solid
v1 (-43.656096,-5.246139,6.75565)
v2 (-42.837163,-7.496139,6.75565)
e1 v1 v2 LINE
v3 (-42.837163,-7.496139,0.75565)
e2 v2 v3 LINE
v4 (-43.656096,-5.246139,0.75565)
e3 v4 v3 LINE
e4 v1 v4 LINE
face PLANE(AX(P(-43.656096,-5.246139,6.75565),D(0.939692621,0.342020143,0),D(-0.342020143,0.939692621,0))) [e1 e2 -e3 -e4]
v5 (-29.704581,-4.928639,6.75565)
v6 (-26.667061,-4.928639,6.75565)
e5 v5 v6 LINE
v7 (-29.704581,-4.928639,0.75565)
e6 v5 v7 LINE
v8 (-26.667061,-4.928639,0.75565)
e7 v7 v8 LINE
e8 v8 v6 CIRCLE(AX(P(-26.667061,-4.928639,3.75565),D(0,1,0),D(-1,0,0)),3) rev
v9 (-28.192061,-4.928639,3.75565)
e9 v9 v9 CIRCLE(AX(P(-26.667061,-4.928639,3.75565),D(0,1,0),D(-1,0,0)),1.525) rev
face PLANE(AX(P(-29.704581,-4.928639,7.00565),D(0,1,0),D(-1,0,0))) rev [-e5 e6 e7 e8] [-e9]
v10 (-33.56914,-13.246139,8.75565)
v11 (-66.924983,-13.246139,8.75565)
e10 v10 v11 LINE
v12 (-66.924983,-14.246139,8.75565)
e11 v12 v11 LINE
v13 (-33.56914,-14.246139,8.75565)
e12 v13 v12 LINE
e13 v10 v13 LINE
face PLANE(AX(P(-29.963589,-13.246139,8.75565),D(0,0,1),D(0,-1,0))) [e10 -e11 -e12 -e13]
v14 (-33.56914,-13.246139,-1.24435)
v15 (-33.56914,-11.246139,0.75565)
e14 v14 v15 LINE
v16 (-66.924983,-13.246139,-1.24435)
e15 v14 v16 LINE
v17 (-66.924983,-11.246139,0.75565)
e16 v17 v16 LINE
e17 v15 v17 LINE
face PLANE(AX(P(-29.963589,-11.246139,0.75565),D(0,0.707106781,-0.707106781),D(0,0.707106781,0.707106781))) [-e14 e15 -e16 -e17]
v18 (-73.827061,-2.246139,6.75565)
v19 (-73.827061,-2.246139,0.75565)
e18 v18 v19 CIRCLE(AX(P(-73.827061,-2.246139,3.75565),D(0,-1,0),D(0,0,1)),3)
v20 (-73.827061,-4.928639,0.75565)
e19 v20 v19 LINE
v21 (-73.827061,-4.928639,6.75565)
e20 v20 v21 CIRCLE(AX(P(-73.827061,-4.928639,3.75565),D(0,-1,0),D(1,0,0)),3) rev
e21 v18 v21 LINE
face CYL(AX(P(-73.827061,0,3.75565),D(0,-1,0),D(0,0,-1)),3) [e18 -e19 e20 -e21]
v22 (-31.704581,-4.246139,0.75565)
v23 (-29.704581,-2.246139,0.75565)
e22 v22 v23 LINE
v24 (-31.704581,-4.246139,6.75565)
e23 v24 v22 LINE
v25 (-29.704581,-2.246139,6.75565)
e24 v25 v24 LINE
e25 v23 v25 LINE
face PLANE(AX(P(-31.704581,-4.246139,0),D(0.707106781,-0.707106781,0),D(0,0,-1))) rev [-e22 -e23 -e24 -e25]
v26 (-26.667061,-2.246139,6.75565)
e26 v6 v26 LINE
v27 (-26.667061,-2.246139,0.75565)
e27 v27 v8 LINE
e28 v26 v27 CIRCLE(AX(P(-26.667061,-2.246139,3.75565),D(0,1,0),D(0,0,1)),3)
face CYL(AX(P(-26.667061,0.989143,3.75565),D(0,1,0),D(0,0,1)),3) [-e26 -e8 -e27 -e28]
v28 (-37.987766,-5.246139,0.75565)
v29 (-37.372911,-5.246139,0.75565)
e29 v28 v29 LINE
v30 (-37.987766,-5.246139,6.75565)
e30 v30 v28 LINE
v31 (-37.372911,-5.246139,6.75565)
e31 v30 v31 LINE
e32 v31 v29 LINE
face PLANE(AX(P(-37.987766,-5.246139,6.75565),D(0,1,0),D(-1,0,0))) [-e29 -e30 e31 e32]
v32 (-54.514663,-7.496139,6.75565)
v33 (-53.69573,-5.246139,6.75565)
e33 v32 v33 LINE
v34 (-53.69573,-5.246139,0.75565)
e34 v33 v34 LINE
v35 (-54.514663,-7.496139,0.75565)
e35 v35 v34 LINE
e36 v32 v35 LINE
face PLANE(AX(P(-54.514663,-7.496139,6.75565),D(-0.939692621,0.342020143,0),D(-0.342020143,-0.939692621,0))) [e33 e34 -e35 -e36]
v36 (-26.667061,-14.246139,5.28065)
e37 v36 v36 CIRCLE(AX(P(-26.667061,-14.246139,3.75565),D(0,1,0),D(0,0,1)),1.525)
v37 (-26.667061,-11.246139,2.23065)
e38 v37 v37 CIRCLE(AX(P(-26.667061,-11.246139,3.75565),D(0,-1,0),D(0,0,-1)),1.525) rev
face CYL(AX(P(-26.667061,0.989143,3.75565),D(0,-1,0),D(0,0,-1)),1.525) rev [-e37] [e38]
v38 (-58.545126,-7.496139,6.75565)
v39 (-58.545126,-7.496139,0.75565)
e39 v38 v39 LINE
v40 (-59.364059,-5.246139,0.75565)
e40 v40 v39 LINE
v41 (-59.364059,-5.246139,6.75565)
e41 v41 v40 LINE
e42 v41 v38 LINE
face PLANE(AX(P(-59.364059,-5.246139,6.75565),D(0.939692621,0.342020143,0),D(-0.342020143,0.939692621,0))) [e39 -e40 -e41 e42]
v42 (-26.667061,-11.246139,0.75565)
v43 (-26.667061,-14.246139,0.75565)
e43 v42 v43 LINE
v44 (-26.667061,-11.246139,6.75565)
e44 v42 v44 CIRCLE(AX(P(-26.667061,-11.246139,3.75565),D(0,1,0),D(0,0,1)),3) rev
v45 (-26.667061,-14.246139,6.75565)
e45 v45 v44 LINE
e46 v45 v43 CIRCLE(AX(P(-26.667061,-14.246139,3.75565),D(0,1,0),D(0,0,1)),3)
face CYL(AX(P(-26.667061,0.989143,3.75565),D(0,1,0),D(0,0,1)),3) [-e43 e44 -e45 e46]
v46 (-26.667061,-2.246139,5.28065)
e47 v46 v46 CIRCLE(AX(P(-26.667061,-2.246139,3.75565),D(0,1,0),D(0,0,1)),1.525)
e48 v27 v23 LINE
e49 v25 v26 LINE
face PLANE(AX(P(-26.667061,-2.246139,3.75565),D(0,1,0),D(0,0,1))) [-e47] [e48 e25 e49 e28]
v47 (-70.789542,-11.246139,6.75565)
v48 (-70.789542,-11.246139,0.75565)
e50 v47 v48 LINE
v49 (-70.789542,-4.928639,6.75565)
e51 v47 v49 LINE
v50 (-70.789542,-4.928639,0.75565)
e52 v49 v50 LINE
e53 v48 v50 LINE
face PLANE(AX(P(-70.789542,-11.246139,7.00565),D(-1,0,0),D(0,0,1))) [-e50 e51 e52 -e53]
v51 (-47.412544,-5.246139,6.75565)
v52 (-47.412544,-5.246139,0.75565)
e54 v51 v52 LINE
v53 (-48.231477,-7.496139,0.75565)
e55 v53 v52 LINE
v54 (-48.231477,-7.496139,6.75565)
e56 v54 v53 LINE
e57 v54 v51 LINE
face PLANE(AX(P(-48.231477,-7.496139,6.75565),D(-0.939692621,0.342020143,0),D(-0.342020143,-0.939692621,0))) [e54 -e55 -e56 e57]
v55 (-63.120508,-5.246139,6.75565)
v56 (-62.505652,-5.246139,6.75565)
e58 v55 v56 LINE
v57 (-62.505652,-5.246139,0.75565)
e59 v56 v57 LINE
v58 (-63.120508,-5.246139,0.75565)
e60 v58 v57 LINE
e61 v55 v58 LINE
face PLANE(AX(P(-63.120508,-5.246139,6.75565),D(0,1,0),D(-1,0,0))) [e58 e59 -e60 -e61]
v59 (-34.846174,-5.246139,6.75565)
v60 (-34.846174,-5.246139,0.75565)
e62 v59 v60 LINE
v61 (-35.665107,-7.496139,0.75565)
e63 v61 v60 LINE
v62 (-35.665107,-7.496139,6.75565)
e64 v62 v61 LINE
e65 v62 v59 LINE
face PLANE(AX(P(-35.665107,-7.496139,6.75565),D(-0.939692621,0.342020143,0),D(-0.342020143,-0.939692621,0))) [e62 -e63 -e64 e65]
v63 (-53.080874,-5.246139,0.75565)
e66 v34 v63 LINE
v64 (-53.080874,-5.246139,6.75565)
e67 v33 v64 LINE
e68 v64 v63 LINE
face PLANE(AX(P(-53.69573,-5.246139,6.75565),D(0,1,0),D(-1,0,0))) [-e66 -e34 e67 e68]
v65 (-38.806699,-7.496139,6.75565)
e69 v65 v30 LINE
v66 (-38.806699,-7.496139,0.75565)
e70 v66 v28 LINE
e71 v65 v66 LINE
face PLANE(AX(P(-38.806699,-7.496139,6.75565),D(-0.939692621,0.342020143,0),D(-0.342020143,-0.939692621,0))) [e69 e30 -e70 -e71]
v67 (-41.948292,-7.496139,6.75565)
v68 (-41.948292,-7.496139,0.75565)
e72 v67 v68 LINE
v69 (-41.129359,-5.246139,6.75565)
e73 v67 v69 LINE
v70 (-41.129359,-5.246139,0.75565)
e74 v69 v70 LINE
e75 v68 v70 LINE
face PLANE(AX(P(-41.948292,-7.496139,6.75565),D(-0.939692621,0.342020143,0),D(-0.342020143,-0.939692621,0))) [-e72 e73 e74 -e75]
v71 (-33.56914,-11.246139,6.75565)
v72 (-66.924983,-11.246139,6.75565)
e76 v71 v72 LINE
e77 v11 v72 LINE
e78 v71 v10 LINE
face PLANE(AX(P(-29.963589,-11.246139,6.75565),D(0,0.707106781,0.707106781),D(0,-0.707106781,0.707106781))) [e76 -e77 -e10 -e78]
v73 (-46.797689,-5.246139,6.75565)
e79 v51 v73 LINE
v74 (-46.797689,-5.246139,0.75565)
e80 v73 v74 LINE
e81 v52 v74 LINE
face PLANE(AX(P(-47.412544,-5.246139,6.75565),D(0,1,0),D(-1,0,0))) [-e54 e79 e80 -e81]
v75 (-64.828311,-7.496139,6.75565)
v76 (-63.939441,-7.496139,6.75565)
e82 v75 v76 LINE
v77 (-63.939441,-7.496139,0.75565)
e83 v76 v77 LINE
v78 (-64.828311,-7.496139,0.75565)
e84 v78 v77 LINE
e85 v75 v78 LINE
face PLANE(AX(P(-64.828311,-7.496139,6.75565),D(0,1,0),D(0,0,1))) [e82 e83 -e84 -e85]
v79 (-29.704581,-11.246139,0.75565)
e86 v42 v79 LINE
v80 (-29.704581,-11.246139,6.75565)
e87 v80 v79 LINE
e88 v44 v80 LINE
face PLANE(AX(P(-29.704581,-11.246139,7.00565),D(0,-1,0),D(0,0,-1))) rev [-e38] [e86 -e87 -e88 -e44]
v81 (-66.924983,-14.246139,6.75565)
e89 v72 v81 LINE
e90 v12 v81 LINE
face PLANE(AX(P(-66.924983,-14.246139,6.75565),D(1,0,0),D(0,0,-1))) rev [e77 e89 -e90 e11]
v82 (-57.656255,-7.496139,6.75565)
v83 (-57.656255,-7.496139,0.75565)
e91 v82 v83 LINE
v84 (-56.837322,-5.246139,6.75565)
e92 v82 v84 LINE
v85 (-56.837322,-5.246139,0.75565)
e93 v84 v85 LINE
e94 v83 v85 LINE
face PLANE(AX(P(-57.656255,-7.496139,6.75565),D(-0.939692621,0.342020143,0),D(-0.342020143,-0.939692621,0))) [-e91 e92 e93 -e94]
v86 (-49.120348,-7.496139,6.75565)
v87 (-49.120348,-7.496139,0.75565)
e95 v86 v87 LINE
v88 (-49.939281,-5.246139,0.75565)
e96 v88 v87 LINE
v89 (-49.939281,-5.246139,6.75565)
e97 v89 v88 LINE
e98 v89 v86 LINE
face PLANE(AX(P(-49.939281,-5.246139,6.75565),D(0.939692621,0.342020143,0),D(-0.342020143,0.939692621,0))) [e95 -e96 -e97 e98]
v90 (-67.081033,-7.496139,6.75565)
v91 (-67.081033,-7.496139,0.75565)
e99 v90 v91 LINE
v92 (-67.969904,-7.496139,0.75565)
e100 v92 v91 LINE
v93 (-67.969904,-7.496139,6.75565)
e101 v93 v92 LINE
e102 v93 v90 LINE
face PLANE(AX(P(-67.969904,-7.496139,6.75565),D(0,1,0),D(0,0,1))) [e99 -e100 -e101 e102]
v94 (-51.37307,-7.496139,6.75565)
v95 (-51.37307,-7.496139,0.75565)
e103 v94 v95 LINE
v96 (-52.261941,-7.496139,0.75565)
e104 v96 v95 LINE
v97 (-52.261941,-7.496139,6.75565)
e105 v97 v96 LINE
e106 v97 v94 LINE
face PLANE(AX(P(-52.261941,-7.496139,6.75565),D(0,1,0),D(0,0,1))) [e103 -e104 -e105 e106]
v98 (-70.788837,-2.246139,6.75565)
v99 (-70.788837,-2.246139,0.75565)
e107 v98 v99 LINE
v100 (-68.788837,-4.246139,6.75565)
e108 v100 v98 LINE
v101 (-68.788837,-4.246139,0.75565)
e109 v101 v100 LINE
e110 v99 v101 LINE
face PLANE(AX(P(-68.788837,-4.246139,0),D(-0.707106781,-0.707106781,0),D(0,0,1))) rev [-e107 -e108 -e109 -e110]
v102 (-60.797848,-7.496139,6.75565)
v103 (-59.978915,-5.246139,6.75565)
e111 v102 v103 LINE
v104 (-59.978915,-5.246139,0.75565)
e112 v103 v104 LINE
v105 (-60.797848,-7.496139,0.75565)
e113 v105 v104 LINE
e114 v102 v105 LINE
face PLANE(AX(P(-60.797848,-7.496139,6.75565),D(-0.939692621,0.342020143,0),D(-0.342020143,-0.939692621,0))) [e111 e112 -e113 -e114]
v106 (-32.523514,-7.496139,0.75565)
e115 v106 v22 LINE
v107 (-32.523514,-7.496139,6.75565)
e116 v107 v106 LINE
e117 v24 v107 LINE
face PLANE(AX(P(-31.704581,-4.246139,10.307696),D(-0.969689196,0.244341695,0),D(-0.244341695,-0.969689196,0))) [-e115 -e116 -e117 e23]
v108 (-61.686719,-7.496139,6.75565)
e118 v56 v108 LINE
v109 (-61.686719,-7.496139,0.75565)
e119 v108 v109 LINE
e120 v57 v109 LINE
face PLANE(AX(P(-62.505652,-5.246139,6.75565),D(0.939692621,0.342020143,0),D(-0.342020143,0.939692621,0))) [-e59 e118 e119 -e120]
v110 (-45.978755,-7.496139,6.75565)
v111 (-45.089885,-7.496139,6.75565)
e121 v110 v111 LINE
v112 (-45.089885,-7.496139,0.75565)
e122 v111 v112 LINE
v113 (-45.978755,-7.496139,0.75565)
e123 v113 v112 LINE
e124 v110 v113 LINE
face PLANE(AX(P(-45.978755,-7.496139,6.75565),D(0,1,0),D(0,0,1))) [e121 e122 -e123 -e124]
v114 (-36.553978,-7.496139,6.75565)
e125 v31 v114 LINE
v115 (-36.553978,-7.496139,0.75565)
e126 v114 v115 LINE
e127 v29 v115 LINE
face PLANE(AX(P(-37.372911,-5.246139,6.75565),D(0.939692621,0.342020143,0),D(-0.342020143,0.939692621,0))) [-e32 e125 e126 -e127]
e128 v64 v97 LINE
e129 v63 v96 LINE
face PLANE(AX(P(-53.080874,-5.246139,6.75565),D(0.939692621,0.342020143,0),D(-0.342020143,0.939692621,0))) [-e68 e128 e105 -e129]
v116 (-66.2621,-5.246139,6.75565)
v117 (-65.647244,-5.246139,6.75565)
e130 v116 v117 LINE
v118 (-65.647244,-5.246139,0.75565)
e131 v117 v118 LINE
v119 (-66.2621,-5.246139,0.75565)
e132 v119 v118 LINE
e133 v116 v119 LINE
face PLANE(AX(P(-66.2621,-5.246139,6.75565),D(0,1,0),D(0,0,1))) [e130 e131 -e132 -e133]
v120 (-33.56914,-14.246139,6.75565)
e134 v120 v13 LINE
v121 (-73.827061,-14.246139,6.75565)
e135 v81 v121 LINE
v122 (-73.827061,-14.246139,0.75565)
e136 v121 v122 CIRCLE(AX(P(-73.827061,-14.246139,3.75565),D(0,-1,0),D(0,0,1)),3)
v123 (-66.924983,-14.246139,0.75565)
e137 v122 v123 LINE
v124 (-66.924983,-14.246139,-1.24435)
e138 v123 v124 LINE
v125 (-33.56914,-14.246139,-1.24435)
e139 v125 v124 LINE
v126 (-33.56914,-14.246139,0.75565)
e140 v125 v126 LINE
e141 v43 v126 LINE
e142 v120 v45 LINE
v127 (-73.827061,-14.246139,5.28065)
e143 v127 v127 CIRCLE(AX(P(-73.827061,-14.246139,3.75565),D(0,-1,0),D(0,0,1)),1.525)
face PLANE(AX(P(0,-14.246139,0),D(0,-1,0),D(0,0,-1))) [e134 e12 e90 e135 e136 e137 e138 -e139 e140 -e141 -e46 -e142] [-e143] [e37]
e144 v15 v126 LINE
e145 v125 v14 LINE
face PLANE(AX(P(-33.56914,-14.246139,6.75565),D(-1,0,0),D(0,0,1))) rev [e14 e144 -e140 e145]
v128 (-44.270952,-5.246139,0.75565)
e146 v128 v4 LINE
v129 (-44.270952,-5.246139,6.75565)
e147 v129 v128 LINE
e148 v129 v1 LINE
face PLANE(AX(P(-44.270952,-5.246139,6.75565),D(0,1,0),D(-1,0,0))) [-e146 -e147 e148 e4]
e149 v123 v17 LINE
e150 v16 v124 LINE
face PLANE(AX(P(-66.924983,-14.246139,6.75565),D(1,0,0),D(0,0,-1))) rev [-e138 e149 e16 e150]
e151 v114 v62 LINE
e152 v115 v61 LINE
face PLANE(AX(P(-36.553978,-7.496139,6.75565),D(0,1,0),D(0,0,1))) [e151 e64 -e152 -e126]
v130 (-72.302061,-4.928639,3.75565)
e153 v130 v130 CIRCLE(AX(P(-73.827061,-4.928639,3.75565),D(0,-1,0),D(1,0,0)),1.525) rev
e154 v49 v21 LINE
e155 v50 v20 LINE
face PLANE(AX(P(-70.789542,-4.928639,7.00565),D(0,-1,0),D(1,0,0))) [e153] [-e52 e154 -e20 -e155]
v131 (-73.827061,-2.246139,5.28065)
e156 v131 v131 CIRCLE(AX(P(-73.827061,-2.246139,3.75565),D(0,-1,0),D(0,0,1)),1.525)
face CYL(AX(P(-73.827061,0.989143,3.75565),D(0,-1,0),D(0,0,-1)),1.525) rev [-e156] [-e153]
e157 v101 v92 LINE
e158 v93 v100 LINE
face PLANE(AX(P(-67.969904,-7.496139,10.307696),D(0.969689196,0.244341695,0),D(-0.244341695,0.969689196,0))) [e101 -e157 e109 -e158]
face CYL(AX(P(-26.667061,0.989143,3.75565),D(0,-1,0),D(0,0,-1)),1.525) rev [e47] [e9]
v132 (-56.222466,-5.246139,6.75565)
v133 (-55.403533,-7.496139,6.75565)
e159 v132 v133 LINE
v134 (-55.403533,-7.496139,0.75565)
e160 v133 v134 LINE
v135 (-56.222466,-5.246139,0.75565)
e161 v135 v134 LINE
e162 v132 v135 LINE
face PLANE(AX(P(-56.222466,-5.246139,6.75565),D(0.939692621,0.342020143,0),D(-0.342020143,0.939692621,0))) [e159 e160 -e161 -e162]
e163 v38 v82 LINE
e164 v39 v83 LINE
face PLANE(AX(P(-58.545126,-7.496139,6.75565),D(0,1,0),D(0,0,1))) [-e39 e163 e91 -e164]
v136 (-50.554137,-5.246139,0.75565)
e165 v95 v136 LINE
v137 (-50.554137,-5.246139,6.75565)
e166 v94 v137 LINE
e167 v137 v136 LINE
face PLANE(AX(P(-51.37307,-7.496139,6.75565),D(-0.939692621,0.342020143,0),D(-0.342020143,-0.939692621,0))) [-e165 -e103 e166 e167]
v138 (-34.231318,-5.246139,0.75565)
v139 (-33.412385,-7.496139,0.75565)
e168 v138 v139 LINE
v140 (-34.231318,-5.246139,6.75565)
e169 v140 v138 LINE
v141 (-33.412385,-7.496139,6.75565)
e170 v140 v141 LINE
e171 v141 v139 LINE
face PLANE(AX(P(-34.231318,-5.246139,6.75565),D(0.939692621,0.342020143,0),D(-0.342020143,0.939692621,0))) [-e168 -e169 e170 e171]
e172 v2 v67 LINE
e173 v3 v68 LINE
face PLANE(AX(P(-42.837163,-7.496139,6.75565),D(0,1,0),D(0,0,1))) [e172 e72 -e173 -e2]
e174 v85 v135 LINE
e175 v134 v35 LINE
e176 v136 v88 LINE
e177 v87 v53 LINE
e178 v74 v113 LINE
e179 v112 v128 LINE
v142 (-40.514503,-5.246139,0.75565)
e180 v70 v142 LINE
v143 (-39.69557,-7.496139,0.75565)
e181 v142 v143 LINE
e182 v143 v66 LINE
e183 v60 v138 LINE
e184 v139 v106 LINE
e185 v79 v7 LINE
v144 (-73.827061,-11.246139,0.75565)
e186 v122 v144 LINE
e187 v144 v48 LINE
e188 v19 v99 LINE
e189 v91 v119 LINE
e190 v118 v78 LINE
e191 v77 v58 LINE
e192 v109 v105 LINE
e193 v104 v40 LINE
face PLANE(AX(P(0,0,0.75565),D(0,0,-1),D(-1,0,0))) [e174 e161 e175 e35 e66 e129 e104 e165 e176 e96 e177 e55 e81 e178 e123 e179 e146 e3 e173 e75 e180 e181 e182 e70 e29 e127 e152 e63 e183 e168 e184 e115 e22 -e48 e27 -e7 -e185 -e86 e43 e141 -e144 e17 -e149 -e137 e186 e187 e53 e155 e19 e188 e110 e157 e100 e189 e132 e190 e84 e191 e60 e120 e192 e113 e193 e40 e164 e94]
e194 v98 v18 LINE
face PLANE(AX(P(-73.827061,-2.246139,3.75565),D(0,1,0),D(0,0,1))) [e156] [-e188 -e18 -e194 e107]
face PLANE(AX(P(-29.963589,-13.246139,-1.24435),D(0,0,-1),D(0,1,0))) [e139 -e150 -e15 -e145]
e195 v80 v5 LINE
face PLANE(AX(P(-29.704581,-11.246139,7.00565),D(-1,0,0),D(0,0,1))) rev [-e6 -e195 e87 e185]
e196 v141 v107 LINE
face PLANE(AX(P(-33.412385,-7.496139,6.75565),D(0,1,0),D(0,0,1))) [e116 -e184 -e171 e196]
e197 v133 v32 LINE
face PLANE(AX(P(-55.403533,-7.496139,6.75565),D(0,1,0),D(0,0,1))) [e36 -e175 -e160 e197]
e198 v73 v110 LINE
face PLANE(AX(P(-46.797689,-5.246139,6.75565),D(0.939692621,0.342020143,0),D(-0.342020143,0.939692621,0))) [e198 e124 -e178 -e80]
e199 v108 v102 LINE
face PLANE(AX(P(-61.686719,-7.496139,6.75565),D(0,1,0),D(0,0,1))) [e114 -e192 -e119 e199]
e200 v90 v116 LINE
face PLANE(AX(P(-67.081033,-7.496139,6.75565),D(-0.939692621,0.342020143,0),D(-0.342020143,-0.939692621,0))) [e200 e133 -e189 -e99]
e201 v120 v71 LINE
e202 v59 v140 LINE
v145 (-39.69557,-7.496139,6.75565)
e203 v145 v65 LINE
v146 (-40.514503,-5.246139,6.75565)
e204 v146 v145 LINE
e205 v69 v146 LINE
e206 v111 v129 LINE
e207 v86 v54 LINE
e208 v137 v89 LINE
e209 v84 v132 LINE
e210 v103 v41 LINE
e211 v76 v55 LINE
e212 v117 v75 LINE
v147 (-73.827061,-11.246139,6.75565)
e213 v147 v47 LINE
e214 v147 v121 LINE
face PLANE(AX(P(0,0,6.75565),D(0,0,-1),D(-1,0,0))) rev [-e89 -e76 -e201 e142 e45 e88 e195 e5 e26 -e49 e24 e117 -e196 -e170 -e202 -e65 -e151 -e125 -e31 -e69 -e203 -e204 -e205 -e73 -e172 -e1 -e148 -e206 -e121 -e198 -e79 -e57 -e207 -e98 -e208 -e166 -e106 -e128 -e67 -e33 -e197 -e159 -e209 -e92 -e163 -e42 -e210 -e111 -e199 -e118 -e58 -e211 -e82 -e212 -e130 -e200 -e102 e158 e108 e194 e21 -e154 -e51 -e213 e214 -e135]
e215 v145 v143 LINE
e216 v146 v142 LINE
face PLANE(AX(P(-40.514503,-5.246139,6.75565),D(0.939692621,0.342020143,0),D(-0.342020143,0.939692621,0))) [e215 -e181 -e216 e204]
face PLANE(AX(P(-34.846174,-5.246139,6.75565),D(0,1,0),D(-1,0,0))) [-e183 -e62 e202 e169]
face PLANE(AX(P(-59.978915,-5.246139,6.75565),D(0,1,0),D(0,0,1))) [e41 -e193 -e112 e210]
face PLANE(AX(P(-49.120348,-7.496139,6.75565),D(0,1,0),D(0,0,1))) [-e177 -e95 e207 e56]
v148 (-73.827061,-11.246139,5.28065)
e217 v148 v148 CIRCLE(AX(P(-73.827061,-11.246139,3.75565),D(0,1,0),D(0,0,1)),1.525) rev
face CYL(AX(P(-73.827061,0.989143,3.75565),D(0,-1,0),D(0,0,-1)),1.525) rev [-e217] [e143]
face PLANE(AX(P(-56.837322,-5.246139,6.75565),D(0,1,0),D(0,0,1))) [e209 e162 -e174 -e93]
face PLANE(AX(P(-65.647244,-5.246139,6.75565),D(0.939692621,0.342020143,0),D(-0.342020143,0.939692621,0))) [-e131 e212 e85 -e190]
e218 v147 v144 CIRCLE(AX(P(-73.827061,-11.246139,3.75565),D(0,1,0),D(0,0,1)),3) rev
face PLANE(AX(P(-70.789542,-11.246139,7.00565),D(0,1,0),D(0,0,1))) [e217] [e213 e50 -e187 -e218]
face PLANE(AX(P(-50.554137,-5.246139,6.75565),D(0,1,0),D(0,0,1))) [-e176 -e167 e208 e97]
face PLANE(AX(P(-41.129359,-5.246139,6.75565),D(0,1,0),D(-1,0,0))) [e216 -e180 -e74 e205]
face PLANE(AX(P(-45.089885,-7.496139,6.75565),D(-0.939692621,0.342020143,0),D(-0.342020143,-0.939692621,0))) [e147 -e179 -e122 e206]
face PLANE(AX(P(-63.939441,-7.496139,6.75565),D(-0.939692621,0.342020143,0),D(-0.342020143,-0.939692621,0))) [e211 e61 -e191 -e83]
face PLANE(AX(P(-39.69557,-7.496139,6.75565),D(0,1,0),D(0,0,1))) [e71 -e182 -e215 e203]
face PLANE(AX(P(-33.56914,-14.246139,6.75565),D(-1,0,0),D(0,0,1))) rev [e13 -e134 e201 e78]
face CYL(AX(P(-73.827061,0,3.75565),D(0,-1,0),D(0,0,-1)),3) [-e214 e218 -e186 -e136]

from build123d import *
from build123d.topology import SkipClean

# Parameters (mm, degrees)
BOSS_EXTRUDE1_DEPTH  = 6
SKETCH2_W            = 6
SKETCH2_H            = 6
SKETCH2_R            = 1.525
BOSS_EXTRUDE2_DEPTH  = 3.75
FILLET1_R            = 3
SKETCH4_W            = 33.355842528
SKETCH4_H            = 6
BOSS_EXTRUDE3_DEPTH  = 3
BOSS_EXTRUDE4_DEPTH  = 33.355842528
BOSS_EXTRUDE5_START  = -6.75
SKETCH7_R            = 1.525
BOSS_EXTRUDE5_DEPTH  = 12
SKETCH8_W            = 6
SKETCH8_H            = 5.25
BOSS_EXTRUDE6_DEPTH  = 1.433789
BOSS_EXTRUDE7_REACH  = 51.468
SKETCH11_W           = 6
SKETCH11_H           = 3
MIRROR1_START        = -14.24613882
MIRROR1_OUTLINE_R    = 1.525
MIRROR1_DEPTH        = 12
SKETCH13_W           = 6
SKETCH13_H           = 5.25
BOSS_EXTRUDE8_DEPTH  = 1.434493
BOSS_EXTRUDE9_REACH  = 51.468
SKETCH14_W           = 6
SKETCH14_H           = 3
CHAMFER1_SIZE        = 2
SKETCH15_W           = 7.967920834
SKETCH15_H           = 6.3175
CUT_EXTRUDE1_DEPTH   = 6.25
BOSS_EXTRUDE10_DEPTH = 6


# Read off the part's stored shape, not the designer's step: Mirror1
# Some blends are built 0.0001 mm under size
with BuildPart() as part:
    # Sketch1 → Boss-Extrude1 (new body)
    with BuildSketch(Plane(origin=(0, 0, 0.755649514), x_dir=(-1, 0, 0), z_dir=(0, 0, -1))):
        Polygon((31.089725273, -5.24613882), (30.270792245, -7.49613882), (29.667061326, -7.49613882), (29.667061326, -11.24613882), (70.667061326, -11.24613882), (70.827061326, -11.24613882), (70.827061326, -7.49613882), (70.667061326, -7.49613882), (70.222625956, -7.49613882), (69.403692929, -5.24613882), (68.788837073, -5.24613882), (67.969904045, -7.49613882), (67.081033306, -7.49613882), (66.262100279, -5.24613882), (65.647244423, -5.24613882), (64.828311395, -7.49613882), (63.939440656, -7.49613882), (63.120507629, -5.24613882), (62.505651773, -5.24613882), (61.686718745, -7.49613882), (60.797848006, -7.49613882), (59.978914979, -5.24613882), (59.364059123, -5.24613882), (58.545126095, -7.49613882), (57.656255356, -7.49613882), (56.837322329, -5.24613882), (56.222466473, -5.24613882), (55.403533445, -7.49613882), (54.514662706, -7.49613882), (53.695729679, -5.24613882), (53.080873823, -5.24613882), (52.261940795, -7.49613882), (51.373070056, -7.49613882), (50.554137029, -5.24613882), (49.939281173, -5.24613882), (49.120348145, -7.49613882), (48.231477406, -7.49613882), (47.412544379, -5.24613882), (46.797688523, -5.24613882), (45.978755495, -7.49613882), (45.089884756, -7.49613882), (44.270951729, -5.24613882), (43.656095873, -5.24613882), (42.837162845, -7.49613882), (41.948292106, -7.49613882), (41.129359079, -5.24613882), (40.514503223, -5.24613882), (39.695570195, -7.49613882), (38.806699456, -7.49613882), (37.987766429, -5.24613882), (37.372910573, -5.24613882), (36.553977545, -7.49613882), (35.665106806, -7.49613882), (34.846173779, -5.24613882), (34.231317923, -5.24613882), (33.412384895, -7.49613882), (32.523514156, -7.49613882), (31.704581129, -5.24613882), align=None)
    extrude(amount=-BOSS_EXTRUDE1_DEPTH)

    # Sketch2 → Boss-Extrude2 (add)
    # profile 1 of 2: a face of its own
    with BuildSketch(Plane.XZ.offset(11.24613882)):
        with Locations((-73.827061326, 3.755649514)):
            Rectangle(SKETCH2_W, SKETCH2_H)
        with Locations(Location((-73.827061326, 3.755649514, 0), (0, 0, 270))):
            Circle(SKETCH2_R, mode=Mode.SUBTRACT)
    # profile 2 of 2: a face of its own
    with BuildSketch(Plane.XZ.offset(11.24613882)):
        with Locations((-26.667061326, 3.755649514)):
            Rectangle(SKETCH2_W, SKETCH2_H)
        with Locations(Location((-26.667061326, 3.755649514, 0), (0, 0, 270))):
            Circle(SKETCH2_R, mode=Mode.SUBTRACT)
    extrude(amount=-BOSS_EXTRUDE2_DEPTH)

    # Fillet1
    fillet1_edges = [part.edges().sort_by_distance(p)[0] for p in [
        (-23.667061326, -9.37113882, 0.755649514),
        (-23.667061326, -9.37113882, 6.755649514),
        (-76.827061326, -9.37113882, 6.755649514),
        (-76.827061326, -9.37113882, 0.755649514),
    ]]
    fillet(fillet1_edges, radius=FILLET1_R - 0.0001)  # a hair under: the kernel refuses the full size

    # Sketch4 → Boss-Extrude3 (add)
    with BuildSketch(Plane.XZ.offset(11.24613882)):
        with Locations((-50.247061326, 3.755649514)):
            Rectangle(SKETCH4_W, SKETCH4_H)
    extrude(amount=BOSS_EXTRUDE3_DEPTH)

    # Sketch5 → Boss-Extrude4 (add)
    with BuildSketch(Plane.ZY.offset(66.92498259)):
        Polygon((0.755649514, -11.24613882), (-1.244350486, -13.24613882), (-1.244350486, -14.24613882), (0.755649514, -14.24613882), align=None)
        Polygon((8.755649514, -13.24613882), (8.755649514, -14.24613882), (6.755649514, -14.24613882), (6.755649514, -11.24613882), align=None)
    extrude(amount=-BOSS_EXTRUDE4_DEPTH)

    # Sketch7 → Boss-Extrude5 (add)
    with BuildSketch(Plane(origin=(0, -7.49613882, 0), x_dir=(1, 0, 0), z_dir=(0, 1, 0)).offset(BOSS_EXTRUDE5_START)):
        with BuildLine():
            Line((-26.667061326, -0.755649514), (-30.270792245, -0.755649514))
            Line((-30.270792245, -0.755649514), (-30.270792245, -6.755649514))
            Line((-30.270792245, -6.755649514), (-26.667061326, -6.755649514))
            ThreePointArc((-26.667061326, -6.755649514), (-24.545740982, -5.876969858), (-23.667061326, -3.755649514))
            ThreePointArc((-23.667061326, -3.755649514), (-24.545740982, -1.634329171), (-26.667061326, -0.755649514))
        make_face()
        with Locations(Location((-26.667061326, -3.755649514, 0), (0, 0, 270))):
            Circle(SKETCH7_R, mode=Mode.SUBTRACT)
    extrude(amount=BOSS_EXTRUDE5_DEPTH)

    # Sketch8 → Boss-Extrude6 (add)
    with BuildSketch(Plane.ZY.offset(30.270792245)):
        with Locations((3.755649514, -4.87113882)):
            Rectangle(SKETCH8_W, SKETCH8_H)
    extrude(amount=BOSS_EXTRUDE6_DEPTH)

    # Sketch11 → Boss-Extrude7 (add, up to next)
    with BuildSketch(Plane.ZY.offset(30.270792245), mode=Mode.PRIVATE) as boss_extrude7_sk1:
        with Locations((3.755649514, -12.74613882)):
            Rectangle(SKETCH11_W, SKETCH11_H)
    boss_extrude7_tool1 = extrude(boss_extrude7_sk1.sketch, amount=BOSS_EXTRUDE7_REACH, mode=Mode.PRIVATE) - part.part
    add(boss_extrude7_tool1.solids().sort_by_distance((-30.270792, -12.746139, 3.75565))[0])

    # Mirror1 outline → Mirror1 (add)
    with SkipClean():  # the faces are left unmerged after this step: merging them gives an invalid solid
        with BuildSketch(Plane(origin=(0, 0, 0), x_dir=(1, 0, 0), z_dir=(0, 1, 0)).offset(MIRROR1_START)):
            with BuildLine():
                ThreePointArc((-73.827061326, -0.755649514), (-76.827061326, -3.755649514), (-73.827061326, -6.755649514))
                Line((-73.827061326, -6.755649514), (-70.223330406, -6.755649514))
                Line((-70.223330406, -6.755649514), (-70.223330406, -0.755649514))
                Line((-70.223330406, -0.755649514), (-73.827061326, -0.755649514))
            make_face()
            with Locations((-73.827061326, -3.755649514)):
                Circle(MIRROR1_OUTLINE_R, mode=Mode.SUBTRACT)
        extrude(amount=MIRROR1_DEPTH)

    # Sketch13 → Boss-Extrude8 (add)
    with SkipClean():  # the faces are left unmerged after this step: merging them gives an invalid solid
        with BuildSketch(Plane(origin=(-70.223330406, 0, 0), x_dir=(0, 0, -1), z_dir=(1, 0, 0))):
            with Locations((-3.755649514, -4.87113882)):
                Rectangle(SKETCH13_W, SKETCH13_H)
        extrude(amount=BOSS_EXTRUDE8_DEPTH)

    # Sketch14 → Boss-Extrude9 (add, up to next)
    with BuildSketch(Plane(origin=(-70.223330406, 0, 0), x_dir=(0, 0, -1), z_dir=(1, 0, 0)), mode=Mode.PRIVATE) as boss_extrude9_sk1:
        with Locations((-3.755649514, -12.74613882)):
            Rectangle(SKETCH14_W, SKETCH14_H)
    boss_extrude9_tool1 = extrude(boss_extrude9_sk1.sketch, amount=BOSS_EXTRUDE9_REACH, mode=Mode.PRIVATE) - part.part
    add(boss_extrude9_tool1.solids().sort_by_distance((-70.22333, -12.746139, 3.75565))[0])

    # Chamfer1
    # the kernel refuses this chamfer: 2 mm, written as the material it takes off along each edge
    with BuildSketch(Plane(origin=(-31.704581245, -2.24613882, 11.89901549), x_dir=(0.9996219169112968, 0.027495876610586296, 0), z_dir=(0, 0, -1))) as chamfer1_piece_1:
        Polygon((CHAMFER1_SIZE * 0.999621916911, CHAMFER1_SIZE * 0.0274958766106), (-CHAMFER1_SIZE * 0.0274958766106, CHAMFER1_SIZE * 0.999621916911), (0, 0), align=None)
    extrude(amount=16.286731952, mode=Mode.SUBTRACT)
    with BuildSketch(Plane(origin=(-68.788837406, -2.24613882, -4.387716461), x_dir=(0.027495876610589064, -0.9996219169112965, 0), z_dir=(0, 0, 1))) as chamfer1_piece_2:
        Polygon((CHAMFER1_SIZE * 0.999621916911, -CHAMFER1_SIZE * 0.0274958766106), (-CHAMFER1_SIZE * 0.0274958766106, -CHAMFER1_SIZE * 0.999621916911), (0, 0), align=None)
    extrude(amount=16.286731952, mode=Mode.SUBTRACT)

    # Sketch15 → Cut-Extrude1 (cut)
    with BuildSketch(Plane(origin=(0, 0, 0.755649514), x_dir=(-1, 0, 0), z_dir=(0, 0, -1))):
        with Locations((25.720620712, -8.08738882)):
            Rectangle(SKETCH15_W, SKETCH15_H)
    cut_extrude1 = extrude(amount=-CUT_EXTRUDE1_DEPTH, mode=Mode.SUBTRACT)

    # Mirror2: Cut-Extrude1 across plane
    add(cut_extrude1.mirror(Plane(origin=(-50.247061326, 0, 0), x_dir=(0, 0, 1), z_dir=(1, 0, 0))), mode=Mode.SUBTRACT)

    # Sketch16 → Boss-Extrude10 (add)
    with BuildSketch(Plane(origin=(0, 0, 0.755649514), x_dir=(-1, 0, 0), z_dir=(0, 0, -1))):
        Polygon((67.969904045, -7.49613882), (68.788837073, -4.24613882), (68.788837073, -7.702493067), align=None)
        Polygon((31.704581129, -4.24613882), (32.523514156, -7.49613882), (31.704581129, -7.702493067), align=None)
    extrude(amount=-BOSS_EXTRUDE10_DEPTH)


solid = part.part
